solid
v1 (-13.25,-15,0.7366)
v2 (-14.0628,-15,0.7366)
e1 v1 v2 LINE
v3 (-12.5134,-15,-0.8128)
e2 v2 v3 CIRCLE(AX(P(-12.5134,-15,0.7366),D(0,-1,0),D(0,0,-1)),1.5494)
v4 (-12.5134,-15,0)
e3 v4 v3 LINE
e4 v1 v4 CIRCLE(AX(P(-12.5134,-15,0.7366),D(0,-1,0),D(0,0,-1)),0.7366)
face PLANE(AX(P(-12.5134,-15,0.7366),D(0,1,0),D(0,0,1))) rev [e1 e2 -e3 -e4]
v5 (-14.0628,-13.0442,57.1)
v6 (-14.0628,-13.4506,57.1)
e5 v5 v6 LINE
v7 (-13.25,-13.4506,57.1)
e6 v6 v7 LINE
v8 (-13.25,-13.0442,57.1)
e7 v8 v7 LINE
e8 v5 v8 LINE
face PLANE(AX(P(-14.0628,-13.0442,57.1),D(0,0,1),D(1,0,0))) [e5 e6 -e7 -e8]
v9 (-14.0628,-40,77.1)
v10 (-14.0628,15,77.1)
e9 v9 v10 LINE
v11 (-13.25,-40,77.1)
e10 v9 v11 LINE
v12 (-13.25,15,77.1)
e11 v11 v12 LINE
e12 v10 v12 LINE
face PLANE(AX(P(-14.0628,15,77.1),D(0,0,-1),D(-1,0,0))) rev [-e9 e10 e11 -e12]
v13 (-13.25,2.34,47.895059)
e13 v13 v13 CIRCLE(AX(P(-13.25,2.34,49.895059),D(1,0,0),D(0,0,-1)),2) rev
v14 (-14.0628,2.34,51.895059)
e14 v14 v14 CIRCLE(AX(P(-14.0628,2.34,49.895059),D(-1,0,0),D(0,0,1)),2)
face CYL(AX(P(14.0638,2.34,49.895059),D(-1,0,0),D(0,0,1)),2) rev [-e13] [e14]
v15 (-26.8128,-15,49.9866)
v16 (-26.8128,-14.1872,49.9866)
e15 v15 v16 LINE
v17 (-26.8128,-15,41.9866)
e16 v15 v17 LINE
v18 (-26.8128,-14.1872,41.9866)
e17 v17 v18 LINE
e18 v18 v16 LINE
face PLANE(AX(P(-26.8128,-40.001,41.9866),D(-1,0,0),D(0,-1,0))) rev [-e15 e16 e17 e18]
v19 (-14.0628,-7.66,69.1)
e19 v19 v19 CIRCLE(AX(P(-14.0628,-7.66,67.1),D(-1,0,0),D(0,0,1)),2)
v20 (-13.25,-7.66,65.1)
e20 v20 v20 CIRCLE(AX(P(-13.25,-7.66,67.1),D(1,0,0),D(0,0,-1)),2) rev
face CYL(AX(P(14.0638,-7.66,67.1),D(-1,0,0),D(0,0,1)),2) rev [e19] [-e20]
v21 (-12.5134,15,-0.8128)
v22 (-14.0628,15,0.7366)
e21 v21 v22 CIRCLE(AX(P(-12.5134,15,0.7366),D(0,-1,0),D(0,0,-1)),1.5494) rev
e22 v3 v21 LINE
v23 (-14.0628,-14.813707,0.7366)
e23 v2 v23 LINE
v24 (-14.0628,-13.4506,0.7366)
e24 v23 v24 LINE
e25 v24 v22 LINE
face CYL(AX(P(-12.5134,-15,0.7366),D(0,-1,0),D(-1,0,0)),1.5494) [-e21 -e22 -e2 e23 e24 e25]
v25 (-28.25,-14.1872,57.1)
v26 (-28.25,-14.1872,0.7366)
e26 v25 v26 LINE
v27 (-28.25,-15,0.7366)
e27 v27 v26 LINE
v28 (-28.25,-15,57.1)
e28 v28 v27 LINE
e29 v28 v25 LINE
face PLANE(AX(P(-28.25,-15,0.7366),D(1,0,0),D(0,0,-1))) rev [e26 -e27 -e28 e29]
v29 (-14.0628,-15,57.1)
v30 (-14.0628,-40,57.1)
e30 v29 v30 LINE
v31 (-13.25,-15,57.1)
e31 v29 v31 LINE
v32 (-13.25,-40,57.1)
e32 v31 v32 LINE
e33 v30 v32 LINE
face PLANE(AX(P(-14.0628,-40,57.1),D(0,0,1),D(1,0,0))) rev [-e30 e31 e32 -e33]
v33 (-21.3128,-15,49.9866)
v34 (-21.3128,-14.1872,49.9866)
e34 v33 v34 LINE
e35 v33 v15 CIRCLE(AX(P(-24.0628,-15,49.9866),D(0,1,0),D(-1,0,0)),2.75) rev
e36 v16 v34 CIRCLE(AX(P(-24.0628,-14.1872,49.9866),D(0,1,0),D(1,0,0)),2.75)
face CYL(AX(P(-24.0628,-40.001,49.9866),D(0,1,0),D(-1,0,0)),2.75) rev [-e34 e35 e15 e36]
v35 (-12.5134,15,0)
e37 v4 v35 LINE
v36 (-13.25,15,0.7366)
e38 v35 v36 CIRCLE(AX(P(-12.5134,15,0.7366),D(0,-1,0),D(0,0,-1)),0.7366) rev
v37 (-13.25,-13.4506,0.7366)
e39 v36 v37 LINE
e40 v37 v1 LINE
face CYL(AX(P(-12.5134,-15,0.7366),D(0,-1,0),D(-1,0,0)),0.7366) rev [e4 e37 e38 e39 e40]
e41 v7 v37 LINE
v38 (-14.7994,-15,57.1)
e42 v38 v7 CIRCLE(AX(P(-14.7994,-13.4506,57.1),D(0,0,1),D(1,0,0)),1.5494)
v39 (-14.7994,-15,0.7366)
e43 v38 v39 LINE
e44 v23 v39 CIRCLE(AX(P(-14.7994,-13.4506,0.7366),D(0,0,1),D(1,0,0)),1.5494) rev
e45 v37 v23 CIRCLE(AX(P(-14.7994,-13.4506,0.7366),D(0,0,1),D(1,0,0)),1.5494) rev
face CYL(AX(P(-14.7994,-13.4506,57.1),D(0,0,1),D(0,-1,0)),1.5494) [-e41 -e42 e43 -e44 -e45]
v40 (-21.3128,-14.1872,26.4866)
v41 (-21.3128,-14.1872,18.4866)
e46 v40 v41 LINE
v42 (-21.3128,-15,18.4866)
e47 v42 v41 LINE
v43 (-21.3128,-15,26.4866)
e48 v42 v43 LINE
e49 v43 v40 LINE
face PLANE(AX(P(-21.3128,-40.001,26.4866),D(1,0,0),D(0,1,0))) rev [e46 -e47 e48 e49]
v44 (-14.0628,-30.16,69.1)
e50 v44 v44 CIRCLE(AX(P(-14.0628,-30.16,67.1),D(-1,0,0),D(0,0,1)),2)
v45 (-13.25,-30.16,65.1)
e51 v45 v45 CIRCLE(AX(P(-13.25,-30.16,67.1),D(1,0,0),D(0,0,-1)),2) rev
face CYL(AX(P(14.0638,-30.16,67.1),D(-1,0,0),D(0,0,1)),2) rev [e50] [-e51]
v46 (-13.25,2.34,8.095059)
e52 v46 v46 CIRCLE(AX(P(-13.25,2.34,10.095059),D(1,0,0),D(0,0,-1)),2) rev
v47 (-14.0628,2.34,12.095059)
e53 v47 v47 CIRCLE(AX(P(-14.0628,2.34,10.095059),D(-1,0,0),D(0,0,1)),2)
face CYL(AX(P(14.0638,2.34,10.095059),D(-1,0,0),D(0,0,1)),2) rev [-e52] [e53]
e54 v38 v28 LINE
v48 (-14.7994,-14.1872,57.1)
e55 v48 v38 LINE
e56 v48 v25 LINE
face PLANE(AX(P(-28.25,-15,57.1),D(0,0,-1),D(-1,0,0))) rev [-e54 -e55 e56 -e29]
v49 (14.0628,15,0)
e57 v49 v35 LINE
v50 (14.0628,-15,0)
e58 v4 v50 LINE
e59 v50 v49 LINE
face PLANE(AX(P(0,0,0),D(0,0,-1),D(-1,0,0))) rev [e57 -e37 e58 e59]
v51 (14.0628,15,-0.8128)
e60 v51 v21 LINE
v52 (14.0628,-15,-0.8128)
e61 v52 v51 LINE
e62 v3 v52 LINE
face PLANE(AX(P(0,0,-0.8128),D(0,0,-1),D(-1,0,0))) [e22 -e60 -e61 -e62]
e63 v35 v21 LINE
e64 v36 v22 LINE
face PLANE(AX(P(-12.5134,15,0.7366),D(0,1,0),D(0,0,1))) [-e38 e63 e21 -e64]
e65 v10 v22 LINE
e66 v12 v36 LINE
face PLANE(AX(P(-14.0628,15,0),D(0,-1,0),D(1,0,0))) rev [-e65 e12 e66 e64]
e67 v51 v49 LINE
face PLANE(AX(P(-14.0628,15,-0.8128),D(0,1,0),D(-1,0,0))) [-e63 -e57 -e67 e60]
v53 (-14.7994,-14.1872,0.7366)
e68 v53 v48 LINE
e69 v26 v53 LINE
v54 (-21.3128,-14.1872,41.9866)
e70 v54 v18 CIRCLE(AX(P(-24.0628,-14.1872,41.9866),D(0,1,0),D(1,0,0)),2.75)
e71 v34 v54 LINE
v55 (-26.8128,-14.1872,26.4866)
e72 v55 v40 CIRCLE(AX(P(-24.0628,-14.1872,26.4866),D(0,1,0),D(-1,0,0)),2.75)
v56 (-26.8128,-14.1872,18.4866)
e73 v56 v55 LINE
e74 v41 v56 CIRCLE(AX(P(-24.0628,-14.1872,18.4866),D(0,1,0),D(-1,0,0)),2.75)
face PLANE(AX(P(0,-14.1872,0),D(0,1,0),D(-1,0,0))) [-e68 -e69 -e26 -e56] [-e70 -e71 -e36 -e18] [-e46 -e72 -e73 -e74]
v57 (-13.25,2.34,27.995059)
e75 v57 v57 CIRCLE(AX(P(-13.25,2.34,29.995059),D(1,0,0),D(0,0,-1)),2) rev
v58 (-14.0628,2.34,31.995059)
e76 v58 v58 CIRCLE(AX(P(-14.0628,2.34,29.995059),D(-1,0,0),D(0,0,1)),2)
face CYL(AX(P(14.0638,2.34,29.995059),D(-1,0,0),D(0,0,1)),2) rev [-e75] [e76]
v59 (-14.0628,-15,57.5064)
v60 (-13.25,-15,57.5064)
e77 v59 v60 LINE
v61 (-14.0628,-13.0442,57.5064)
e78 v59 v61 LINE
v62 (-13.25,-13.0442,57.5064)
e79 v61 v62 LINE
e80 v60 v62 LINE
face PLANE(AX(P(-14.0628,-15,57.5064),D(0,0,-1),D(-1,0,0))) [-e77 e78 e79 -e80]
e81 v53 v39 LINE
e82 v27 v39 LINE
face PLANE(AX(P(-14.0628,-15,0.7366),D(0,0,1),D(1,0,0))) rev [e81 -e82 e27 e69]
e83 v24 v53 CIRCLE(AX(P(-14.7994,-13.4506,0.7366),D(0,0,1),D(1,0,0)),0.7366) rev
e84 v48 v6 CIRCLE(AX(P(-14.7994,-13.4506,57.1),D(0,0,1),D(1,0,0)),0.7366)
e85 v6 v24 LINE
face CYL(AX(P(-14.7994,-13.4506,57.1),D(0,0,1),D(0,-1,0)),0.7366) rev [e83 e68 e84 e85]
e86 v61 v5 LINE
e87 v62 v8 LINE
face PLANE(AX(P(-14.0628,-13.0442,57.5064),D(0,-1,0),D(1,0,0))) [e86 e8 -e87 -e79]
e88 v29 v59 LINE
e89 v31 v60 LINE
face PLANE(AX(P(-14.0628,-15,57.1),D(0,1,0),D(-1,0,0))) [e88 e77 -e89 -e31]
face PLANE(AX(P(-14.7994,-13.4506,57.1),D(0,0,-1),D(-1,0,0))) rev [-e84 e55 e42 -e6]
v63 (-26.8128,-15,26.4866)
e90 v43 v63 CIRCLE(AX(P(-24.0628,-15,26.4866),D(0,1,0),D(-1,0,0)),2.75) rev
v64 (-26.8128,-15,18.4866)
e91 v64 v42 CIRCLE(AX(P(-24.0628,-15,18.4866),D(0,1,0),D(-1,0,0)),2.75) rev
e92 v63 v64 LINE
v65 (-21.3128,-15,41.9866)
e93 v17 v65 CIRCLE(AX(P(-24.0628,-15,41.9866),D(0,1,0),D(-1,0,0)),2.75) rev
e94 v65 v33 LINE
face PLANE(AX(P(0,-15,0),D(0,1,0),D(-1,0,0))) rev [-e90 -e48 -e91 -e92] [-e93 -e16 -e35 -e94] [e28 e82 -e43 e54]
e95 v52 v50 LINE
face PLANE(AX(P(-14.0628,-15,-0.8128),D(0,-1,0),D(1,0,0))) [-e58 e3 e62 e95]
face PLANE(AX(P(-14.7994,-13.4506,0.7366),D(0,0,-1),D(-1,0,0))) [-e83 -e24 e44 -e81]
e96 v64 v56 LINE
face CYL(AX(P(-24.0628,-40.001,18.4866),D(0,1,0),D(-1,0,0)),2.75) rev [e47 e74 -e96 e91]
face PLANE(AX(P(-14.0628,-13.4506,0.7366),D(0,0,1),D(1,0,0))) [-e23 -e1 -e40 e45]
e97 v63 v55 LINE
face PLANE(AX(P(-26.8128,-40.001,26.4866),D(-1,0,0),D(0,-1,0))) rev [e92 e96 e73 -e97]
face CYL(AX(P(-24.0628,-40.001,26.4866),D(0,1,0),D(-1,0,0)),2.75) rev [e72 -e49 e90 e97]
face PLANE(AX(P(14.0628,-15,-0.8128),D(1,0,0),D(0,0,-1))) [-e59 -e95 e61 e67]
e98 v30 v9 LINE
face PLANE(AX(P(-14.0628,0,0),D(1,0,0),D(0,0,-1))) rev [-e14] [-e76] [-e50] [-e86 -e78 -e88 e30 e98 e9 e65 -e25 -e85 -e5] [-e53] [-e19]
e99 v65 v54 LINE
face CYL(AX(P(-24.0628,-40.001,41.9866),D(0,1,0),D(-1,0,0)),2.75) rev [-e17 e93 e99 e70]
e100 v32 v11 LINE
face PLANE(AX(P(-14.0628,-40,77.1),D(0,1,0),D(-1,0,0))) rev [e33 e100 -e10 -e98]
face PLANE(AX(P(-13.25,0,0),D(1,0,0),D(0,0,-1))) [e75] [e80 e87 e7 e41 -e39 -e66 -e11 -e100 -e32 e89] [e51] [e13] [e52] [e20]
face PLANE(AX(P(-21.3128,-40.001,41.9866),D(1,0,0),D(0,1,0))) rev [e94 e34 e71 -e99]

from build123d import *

# Parameters (mm, degrees)
SKETCH1_W                    = 28.1256
SKETCH1_H                    = 30
BASE_FLANGE2_DEPTH           = 0.8128
EDGE_FLANGE3_STRIP_W         = 4.7244
EDGE_FLANGE3_STRIP_H         = 0.8128
EDGE_FLANGE3_STRIP_CUT_DEPTH = 30
EDGE_FLANGE3_DEPTH           = 30
EDGE_FLANGE3_FLAT_DEPTH      = 0.8128
EDGE_FLANGE4_START           = 0.7366
EDGE_FLANGE4_DEPTH           = 56.7698
EDGE_FLANGE4_START_2         = 57.1
EDGE_FLANGE4_2_DEPTH         = 0.4064
EDGE_FLANGE4_3_DEPTH         = 56.3634
CUT_EXTRUDE1_REACH           = 93.299
SKETCH22_R                   = 2
CUT_EXTRUDE2_REACH           = 89.146


# Read off the part's stored shape, not the designer's step: Edge-Flange4
# Sheet-metal steps are written as plain solids
with BuildPart() as part:
    # Sketch1 → Base-Flange2 (new body)
    with BuildSketch(Plane.XY):
        Rectangle(SKETCH1_W, SKETCH1_H)
    extrude(amount=-BASE_FLANGE2_DEPTH)

    # Edge-Flange3 strip (across the edge) → Edge-Flange3 strip cut (cut)
    with BuildSketch(Plane(origin=(-14.0628, 15, 0), x_dir=(1, 0, 0), z_dir=(0, -1, 0))):
        with Locations((-0.8128, -0.4064)):
            Rectangle(EDGE_FLANGE3_STRIP_W, EDGE_FLANGE3_STRIP_H)
    extrude(amount=EDGE_FLANGE3_STRIP_CUT_DEPTH, mode=Mode.SUBTRACT)

    # Edge-Flange3 bend section (across the edge) → Edge-Flange3 (add)
    with BuildSketch(Plane(origin=(-14.0628, 15, 0), x_dir=(1, 0, 0), z_dir=(0, -1, 0))):
        with BuildLine():
            Line((0, 0.7366), (0.8128, 0.7366))
            ThreePointArc((0.8128, 0.7366), (1.028545145, 0.215745145), (1.5494, 0))
            Line((1.5494, 0), (1.5494, -0.8128))
            ThreePointArc((1.5494, -0.8128), (0.453808753, -0.358991247), (0, 0.7366))
        make_face()
    extrude(amount=EDGE_FLANGE3_DEPTH)

    # Edge-Flange3 profile (on flange) → Edge-Flange3 flat (add)
    with BuildSketch(Plane(origin=(-14.0628, 0, 0), x_dir=(0, -1, 0), z_dir=(-1, 0, 0))):
        Polygon((-15, 0.7366), (15, 0.7366), (15, 57.1), (40, 57.1), (40, 77.1), (-15, 77.1), align=None)
    extrude(amount=-EDGE_FLANGE3_FLAT_DEPTH)

    # Edge-Flange4 outline → Edge-Flange4 (cut)
    with BuildSketch(Plane.XY.offset(EDGE_FLANGE4_START)):
        with BuildLine():
            ThreePointArc((-13.25, -13.4506), (-13.468624211, -14.244121367), (-14.0628, -14.813707039))
            Line((-14.0628, -14.813707039), (-14.0628, -15))
            Line((-14.0628, -15), (-13.25, -15))
            Line((-13.25, -15), (-13.25, -13.4506))
        make_face()
    extrude(amount=EDGE_FLANGE4_DEPTH, mode=Mode.SUBTRACT)

    # Edge-Flange4 2 outline → Edge-Flange4 2 (cut)
    with BuildSketch(Plane.XY.offset(EDGE_FLANGE4_START_2)):
        with BuildLine():
            Line((-14.0628, -13.0442), (-14.0628, -14.813707039))
            ThreePointArc((-14.0628, -14.813707039), (-13.468624211, -14.244121367), (-13.25, -13.4506))
            Line((-13.25, -13.4506), (-13.25, -13.0442))
            Line((-13.25, -13.0442), (-14.0628, -13.0442))
        make_face()
    extrude(amount=EDGE_FLANGE4_2_DEPTH, mode=Mode.SUBTRACT)

    # Edge-Flange4 3 outline → Edge-Flange4 3 (add)
    with BuildSketch(Plane.XY.offset(EDGE_FLANGE4_START)):
        with BuildLine():
            Line((-28.25, -15), (-14.7994, -15))
            ThreePointArc((-14.7994, -15), (-14.419503755, -14.952704924), (-14.0628, -14.813707039))
            Line((-14.0628, -14.813707039), (-14.0628, -13.4506))
            ThreePointArc((-14.0628, -13.4506), (-14.278545145, -13.971454855), (-14.7994, -14.1872))
            Line((-14.7994, -14.1872), (-28.25, -14.1872))
            Line((-28.25, -14.1872), (-28.25, -15))
        make_face()
    extrude(amount=EDGE_FLANGE4_3_DEPTH)

    # Sketch22 → Cut-Extrude1 (cut, up to next)
    with BuildSketch(Plane.ZY.offset(14.0628), mode=Mode.PRIVATE) as cut_extrude1_sk1:
        with Locations((67.1, -30.16)):
            Circle(SKETCH22_R)
    cut_extrude1_tool1 = extrude(cut_extrude1_sk1.sketch, amount=-CUT_EXTRUDE1_REACH, mode=Mode.PRIVATE) & part.part
    # Sketch22 → Cut-Extrude1 (cut, up to next)
    with BuildSketch(Plane.ZY.offset(14.0628), mode=Mode.PRIVATE) as cut_extrude1_sk2:
        with Locations((67.1, -7.66)):
            Circle(SKETCH22_R)
    cut_extrude1_tool2 = extrude(cut_extrude1_sk2.sketch, amount=-CUT_EXTRUDE1_REACH, mode=Mode.PRIVATE) & part.part
    # Sketch22 → Cut-Extrude1 (cut, up to next)
    with BuildSketch(Plane.ZY.offset(14.0628), mode=Mode.PRIVATE) as cut_extrude1_sk3:
        with Locations((49.895058849, 2.34)):
            Circle(SKETCH22_R)
    cut_extrude1_tool3 = extrude(cut_extrude1_sk3.sketch, amount=-CUT_EXTRUDE1_REACH, mode=Mode.PRIVATE) & part.part
    # Sketch22 → Cut-Extrude1 (cut, up to next)
    with BuildSketch(Plane.ZY.offset(14.0628), mode=Mode.PRIVATE) as cut_extrude1_sk4:
        with Locations((29.995058849, 2.34)):
            Circle(SKETCH22_R)
    cut_extrude1_tool4 = extrude(cut_extrude1_sk4.sketch, amount=-CUT_EXTRUDE1_REACH, mode=Mode.PRIVATE) & part.part
    # Sketch22 → Cut-Extrude1 (cut, up to next)
    with BuildSketch(Plane.ZY.offset(14.0628), mode=Mode.PRIVATE) as cut_extrude1_sk5:
        with Locations((10.095058849, 2.34)):
            Circle(SKETCH22_R)
    cut_extrude1_tool5 = extrude(cut_extrude1_sk5.sketch, amount=-CUT_EXTRUDE1_REACH, mode=Mode.PRIVATE) & part.part
    add(cut_extrude1_tool1.solids().sort_by_distance((-14.0628, -30.16, 67.1))[0], mode=Mode.SUBTRACT)
    add(cut_extrude1_tool2.solids().sort_by_distance((-14.0628, -7.66, 67.1))[0], mode=Mode.SUBTRACT)
    add(cut_extrude1_tool3.solids().sort_by_distance((-14.0628, 2.34, 49.895059))[0], mode=Mode.SUBTRACT)
    add(cut_extrude1_tool4.solids().sort_by_distance((-14.0628, 2.34, 29.995059))[0], mode=Mode.SUBTRACT)
    add(cut_extrude1_tool5.solids().sort_by_distance((-14.0628, 2.34, 10.095059))[0], mode=Mode.SUBTRACT)

    # Sketch23 → Cut-Extrude2 (cut, up to next)
    with BuildSketch(Plane(origin=(0, -14.1872, 0), x_dir=(1, 0, 0), z_dir=(0, 1, 0)), mode=Mode.PRIVATE) as cut_extrude2_sk1:
        with BuildLine():
            Line((-26.8128, -26.4866), (-26.8128, -18.4866))
            ThreePointArc((-26.8128, -18.4866), (-24.0628, -15.7366), (-21.3128, -18.4866))
            Line((-21.3128, -18.4866), (-21.3128, -26.4866))
            ThreePointArc((-21.3128, -26.4866), (-24.0628, -29.2366), (-26.8128, -26.4866))
        make_face()
    cut_extrude2_tool1 = extrude(cut_extrude2_sk1.sketch, amount=-CUT_EXTRUDE2_REACH, mode=Mode.PRIVATE) & part.part
    # Sketch23 → Cut-Extrude2 (cut, up to next)
    with BuildSketch(Plane(origin=(0, -14.1872, 0), x_dir=(1, 0, 0), z_dir=(0, 1, 0)), mode=Mode.PRIVATE) as cut_extrude2_sk2:
        with BuildLine():
            Line((-26.8128, -41.9866), (-26.8128, -49.9866))
            ThreePointArc((-26.8128, -49.9866), (-24.0628, -52.7366), (-21.3128, -49.9866))
            Line((-21.3128, -49.9866), (-21.3128, -41.9866))
            ThreePointArc((-21.3128, -41.9866), (-24.0628, -39.2366), (-26.8128, -41.9866))
        make_face()
    cut_extrude2_tool2 = extrude(cut_extrude2_sk2.sketch, amount=-CUT_EXTRUDE2_REACH, mode=Mode.PRIVATE) & part.part
    add(cut_extrude2_tool1.solids().sort_by_distance((-24.0628, -14.1872, 22.4866))[0], mode=Mode.SUBTRACT)
    add(cut_extrude2_tool2.solids().sort_by_distance((-24.0628, -14.1872, 45.9866))[0], mode=Mode.SUBTRACT)


solid = part.part
